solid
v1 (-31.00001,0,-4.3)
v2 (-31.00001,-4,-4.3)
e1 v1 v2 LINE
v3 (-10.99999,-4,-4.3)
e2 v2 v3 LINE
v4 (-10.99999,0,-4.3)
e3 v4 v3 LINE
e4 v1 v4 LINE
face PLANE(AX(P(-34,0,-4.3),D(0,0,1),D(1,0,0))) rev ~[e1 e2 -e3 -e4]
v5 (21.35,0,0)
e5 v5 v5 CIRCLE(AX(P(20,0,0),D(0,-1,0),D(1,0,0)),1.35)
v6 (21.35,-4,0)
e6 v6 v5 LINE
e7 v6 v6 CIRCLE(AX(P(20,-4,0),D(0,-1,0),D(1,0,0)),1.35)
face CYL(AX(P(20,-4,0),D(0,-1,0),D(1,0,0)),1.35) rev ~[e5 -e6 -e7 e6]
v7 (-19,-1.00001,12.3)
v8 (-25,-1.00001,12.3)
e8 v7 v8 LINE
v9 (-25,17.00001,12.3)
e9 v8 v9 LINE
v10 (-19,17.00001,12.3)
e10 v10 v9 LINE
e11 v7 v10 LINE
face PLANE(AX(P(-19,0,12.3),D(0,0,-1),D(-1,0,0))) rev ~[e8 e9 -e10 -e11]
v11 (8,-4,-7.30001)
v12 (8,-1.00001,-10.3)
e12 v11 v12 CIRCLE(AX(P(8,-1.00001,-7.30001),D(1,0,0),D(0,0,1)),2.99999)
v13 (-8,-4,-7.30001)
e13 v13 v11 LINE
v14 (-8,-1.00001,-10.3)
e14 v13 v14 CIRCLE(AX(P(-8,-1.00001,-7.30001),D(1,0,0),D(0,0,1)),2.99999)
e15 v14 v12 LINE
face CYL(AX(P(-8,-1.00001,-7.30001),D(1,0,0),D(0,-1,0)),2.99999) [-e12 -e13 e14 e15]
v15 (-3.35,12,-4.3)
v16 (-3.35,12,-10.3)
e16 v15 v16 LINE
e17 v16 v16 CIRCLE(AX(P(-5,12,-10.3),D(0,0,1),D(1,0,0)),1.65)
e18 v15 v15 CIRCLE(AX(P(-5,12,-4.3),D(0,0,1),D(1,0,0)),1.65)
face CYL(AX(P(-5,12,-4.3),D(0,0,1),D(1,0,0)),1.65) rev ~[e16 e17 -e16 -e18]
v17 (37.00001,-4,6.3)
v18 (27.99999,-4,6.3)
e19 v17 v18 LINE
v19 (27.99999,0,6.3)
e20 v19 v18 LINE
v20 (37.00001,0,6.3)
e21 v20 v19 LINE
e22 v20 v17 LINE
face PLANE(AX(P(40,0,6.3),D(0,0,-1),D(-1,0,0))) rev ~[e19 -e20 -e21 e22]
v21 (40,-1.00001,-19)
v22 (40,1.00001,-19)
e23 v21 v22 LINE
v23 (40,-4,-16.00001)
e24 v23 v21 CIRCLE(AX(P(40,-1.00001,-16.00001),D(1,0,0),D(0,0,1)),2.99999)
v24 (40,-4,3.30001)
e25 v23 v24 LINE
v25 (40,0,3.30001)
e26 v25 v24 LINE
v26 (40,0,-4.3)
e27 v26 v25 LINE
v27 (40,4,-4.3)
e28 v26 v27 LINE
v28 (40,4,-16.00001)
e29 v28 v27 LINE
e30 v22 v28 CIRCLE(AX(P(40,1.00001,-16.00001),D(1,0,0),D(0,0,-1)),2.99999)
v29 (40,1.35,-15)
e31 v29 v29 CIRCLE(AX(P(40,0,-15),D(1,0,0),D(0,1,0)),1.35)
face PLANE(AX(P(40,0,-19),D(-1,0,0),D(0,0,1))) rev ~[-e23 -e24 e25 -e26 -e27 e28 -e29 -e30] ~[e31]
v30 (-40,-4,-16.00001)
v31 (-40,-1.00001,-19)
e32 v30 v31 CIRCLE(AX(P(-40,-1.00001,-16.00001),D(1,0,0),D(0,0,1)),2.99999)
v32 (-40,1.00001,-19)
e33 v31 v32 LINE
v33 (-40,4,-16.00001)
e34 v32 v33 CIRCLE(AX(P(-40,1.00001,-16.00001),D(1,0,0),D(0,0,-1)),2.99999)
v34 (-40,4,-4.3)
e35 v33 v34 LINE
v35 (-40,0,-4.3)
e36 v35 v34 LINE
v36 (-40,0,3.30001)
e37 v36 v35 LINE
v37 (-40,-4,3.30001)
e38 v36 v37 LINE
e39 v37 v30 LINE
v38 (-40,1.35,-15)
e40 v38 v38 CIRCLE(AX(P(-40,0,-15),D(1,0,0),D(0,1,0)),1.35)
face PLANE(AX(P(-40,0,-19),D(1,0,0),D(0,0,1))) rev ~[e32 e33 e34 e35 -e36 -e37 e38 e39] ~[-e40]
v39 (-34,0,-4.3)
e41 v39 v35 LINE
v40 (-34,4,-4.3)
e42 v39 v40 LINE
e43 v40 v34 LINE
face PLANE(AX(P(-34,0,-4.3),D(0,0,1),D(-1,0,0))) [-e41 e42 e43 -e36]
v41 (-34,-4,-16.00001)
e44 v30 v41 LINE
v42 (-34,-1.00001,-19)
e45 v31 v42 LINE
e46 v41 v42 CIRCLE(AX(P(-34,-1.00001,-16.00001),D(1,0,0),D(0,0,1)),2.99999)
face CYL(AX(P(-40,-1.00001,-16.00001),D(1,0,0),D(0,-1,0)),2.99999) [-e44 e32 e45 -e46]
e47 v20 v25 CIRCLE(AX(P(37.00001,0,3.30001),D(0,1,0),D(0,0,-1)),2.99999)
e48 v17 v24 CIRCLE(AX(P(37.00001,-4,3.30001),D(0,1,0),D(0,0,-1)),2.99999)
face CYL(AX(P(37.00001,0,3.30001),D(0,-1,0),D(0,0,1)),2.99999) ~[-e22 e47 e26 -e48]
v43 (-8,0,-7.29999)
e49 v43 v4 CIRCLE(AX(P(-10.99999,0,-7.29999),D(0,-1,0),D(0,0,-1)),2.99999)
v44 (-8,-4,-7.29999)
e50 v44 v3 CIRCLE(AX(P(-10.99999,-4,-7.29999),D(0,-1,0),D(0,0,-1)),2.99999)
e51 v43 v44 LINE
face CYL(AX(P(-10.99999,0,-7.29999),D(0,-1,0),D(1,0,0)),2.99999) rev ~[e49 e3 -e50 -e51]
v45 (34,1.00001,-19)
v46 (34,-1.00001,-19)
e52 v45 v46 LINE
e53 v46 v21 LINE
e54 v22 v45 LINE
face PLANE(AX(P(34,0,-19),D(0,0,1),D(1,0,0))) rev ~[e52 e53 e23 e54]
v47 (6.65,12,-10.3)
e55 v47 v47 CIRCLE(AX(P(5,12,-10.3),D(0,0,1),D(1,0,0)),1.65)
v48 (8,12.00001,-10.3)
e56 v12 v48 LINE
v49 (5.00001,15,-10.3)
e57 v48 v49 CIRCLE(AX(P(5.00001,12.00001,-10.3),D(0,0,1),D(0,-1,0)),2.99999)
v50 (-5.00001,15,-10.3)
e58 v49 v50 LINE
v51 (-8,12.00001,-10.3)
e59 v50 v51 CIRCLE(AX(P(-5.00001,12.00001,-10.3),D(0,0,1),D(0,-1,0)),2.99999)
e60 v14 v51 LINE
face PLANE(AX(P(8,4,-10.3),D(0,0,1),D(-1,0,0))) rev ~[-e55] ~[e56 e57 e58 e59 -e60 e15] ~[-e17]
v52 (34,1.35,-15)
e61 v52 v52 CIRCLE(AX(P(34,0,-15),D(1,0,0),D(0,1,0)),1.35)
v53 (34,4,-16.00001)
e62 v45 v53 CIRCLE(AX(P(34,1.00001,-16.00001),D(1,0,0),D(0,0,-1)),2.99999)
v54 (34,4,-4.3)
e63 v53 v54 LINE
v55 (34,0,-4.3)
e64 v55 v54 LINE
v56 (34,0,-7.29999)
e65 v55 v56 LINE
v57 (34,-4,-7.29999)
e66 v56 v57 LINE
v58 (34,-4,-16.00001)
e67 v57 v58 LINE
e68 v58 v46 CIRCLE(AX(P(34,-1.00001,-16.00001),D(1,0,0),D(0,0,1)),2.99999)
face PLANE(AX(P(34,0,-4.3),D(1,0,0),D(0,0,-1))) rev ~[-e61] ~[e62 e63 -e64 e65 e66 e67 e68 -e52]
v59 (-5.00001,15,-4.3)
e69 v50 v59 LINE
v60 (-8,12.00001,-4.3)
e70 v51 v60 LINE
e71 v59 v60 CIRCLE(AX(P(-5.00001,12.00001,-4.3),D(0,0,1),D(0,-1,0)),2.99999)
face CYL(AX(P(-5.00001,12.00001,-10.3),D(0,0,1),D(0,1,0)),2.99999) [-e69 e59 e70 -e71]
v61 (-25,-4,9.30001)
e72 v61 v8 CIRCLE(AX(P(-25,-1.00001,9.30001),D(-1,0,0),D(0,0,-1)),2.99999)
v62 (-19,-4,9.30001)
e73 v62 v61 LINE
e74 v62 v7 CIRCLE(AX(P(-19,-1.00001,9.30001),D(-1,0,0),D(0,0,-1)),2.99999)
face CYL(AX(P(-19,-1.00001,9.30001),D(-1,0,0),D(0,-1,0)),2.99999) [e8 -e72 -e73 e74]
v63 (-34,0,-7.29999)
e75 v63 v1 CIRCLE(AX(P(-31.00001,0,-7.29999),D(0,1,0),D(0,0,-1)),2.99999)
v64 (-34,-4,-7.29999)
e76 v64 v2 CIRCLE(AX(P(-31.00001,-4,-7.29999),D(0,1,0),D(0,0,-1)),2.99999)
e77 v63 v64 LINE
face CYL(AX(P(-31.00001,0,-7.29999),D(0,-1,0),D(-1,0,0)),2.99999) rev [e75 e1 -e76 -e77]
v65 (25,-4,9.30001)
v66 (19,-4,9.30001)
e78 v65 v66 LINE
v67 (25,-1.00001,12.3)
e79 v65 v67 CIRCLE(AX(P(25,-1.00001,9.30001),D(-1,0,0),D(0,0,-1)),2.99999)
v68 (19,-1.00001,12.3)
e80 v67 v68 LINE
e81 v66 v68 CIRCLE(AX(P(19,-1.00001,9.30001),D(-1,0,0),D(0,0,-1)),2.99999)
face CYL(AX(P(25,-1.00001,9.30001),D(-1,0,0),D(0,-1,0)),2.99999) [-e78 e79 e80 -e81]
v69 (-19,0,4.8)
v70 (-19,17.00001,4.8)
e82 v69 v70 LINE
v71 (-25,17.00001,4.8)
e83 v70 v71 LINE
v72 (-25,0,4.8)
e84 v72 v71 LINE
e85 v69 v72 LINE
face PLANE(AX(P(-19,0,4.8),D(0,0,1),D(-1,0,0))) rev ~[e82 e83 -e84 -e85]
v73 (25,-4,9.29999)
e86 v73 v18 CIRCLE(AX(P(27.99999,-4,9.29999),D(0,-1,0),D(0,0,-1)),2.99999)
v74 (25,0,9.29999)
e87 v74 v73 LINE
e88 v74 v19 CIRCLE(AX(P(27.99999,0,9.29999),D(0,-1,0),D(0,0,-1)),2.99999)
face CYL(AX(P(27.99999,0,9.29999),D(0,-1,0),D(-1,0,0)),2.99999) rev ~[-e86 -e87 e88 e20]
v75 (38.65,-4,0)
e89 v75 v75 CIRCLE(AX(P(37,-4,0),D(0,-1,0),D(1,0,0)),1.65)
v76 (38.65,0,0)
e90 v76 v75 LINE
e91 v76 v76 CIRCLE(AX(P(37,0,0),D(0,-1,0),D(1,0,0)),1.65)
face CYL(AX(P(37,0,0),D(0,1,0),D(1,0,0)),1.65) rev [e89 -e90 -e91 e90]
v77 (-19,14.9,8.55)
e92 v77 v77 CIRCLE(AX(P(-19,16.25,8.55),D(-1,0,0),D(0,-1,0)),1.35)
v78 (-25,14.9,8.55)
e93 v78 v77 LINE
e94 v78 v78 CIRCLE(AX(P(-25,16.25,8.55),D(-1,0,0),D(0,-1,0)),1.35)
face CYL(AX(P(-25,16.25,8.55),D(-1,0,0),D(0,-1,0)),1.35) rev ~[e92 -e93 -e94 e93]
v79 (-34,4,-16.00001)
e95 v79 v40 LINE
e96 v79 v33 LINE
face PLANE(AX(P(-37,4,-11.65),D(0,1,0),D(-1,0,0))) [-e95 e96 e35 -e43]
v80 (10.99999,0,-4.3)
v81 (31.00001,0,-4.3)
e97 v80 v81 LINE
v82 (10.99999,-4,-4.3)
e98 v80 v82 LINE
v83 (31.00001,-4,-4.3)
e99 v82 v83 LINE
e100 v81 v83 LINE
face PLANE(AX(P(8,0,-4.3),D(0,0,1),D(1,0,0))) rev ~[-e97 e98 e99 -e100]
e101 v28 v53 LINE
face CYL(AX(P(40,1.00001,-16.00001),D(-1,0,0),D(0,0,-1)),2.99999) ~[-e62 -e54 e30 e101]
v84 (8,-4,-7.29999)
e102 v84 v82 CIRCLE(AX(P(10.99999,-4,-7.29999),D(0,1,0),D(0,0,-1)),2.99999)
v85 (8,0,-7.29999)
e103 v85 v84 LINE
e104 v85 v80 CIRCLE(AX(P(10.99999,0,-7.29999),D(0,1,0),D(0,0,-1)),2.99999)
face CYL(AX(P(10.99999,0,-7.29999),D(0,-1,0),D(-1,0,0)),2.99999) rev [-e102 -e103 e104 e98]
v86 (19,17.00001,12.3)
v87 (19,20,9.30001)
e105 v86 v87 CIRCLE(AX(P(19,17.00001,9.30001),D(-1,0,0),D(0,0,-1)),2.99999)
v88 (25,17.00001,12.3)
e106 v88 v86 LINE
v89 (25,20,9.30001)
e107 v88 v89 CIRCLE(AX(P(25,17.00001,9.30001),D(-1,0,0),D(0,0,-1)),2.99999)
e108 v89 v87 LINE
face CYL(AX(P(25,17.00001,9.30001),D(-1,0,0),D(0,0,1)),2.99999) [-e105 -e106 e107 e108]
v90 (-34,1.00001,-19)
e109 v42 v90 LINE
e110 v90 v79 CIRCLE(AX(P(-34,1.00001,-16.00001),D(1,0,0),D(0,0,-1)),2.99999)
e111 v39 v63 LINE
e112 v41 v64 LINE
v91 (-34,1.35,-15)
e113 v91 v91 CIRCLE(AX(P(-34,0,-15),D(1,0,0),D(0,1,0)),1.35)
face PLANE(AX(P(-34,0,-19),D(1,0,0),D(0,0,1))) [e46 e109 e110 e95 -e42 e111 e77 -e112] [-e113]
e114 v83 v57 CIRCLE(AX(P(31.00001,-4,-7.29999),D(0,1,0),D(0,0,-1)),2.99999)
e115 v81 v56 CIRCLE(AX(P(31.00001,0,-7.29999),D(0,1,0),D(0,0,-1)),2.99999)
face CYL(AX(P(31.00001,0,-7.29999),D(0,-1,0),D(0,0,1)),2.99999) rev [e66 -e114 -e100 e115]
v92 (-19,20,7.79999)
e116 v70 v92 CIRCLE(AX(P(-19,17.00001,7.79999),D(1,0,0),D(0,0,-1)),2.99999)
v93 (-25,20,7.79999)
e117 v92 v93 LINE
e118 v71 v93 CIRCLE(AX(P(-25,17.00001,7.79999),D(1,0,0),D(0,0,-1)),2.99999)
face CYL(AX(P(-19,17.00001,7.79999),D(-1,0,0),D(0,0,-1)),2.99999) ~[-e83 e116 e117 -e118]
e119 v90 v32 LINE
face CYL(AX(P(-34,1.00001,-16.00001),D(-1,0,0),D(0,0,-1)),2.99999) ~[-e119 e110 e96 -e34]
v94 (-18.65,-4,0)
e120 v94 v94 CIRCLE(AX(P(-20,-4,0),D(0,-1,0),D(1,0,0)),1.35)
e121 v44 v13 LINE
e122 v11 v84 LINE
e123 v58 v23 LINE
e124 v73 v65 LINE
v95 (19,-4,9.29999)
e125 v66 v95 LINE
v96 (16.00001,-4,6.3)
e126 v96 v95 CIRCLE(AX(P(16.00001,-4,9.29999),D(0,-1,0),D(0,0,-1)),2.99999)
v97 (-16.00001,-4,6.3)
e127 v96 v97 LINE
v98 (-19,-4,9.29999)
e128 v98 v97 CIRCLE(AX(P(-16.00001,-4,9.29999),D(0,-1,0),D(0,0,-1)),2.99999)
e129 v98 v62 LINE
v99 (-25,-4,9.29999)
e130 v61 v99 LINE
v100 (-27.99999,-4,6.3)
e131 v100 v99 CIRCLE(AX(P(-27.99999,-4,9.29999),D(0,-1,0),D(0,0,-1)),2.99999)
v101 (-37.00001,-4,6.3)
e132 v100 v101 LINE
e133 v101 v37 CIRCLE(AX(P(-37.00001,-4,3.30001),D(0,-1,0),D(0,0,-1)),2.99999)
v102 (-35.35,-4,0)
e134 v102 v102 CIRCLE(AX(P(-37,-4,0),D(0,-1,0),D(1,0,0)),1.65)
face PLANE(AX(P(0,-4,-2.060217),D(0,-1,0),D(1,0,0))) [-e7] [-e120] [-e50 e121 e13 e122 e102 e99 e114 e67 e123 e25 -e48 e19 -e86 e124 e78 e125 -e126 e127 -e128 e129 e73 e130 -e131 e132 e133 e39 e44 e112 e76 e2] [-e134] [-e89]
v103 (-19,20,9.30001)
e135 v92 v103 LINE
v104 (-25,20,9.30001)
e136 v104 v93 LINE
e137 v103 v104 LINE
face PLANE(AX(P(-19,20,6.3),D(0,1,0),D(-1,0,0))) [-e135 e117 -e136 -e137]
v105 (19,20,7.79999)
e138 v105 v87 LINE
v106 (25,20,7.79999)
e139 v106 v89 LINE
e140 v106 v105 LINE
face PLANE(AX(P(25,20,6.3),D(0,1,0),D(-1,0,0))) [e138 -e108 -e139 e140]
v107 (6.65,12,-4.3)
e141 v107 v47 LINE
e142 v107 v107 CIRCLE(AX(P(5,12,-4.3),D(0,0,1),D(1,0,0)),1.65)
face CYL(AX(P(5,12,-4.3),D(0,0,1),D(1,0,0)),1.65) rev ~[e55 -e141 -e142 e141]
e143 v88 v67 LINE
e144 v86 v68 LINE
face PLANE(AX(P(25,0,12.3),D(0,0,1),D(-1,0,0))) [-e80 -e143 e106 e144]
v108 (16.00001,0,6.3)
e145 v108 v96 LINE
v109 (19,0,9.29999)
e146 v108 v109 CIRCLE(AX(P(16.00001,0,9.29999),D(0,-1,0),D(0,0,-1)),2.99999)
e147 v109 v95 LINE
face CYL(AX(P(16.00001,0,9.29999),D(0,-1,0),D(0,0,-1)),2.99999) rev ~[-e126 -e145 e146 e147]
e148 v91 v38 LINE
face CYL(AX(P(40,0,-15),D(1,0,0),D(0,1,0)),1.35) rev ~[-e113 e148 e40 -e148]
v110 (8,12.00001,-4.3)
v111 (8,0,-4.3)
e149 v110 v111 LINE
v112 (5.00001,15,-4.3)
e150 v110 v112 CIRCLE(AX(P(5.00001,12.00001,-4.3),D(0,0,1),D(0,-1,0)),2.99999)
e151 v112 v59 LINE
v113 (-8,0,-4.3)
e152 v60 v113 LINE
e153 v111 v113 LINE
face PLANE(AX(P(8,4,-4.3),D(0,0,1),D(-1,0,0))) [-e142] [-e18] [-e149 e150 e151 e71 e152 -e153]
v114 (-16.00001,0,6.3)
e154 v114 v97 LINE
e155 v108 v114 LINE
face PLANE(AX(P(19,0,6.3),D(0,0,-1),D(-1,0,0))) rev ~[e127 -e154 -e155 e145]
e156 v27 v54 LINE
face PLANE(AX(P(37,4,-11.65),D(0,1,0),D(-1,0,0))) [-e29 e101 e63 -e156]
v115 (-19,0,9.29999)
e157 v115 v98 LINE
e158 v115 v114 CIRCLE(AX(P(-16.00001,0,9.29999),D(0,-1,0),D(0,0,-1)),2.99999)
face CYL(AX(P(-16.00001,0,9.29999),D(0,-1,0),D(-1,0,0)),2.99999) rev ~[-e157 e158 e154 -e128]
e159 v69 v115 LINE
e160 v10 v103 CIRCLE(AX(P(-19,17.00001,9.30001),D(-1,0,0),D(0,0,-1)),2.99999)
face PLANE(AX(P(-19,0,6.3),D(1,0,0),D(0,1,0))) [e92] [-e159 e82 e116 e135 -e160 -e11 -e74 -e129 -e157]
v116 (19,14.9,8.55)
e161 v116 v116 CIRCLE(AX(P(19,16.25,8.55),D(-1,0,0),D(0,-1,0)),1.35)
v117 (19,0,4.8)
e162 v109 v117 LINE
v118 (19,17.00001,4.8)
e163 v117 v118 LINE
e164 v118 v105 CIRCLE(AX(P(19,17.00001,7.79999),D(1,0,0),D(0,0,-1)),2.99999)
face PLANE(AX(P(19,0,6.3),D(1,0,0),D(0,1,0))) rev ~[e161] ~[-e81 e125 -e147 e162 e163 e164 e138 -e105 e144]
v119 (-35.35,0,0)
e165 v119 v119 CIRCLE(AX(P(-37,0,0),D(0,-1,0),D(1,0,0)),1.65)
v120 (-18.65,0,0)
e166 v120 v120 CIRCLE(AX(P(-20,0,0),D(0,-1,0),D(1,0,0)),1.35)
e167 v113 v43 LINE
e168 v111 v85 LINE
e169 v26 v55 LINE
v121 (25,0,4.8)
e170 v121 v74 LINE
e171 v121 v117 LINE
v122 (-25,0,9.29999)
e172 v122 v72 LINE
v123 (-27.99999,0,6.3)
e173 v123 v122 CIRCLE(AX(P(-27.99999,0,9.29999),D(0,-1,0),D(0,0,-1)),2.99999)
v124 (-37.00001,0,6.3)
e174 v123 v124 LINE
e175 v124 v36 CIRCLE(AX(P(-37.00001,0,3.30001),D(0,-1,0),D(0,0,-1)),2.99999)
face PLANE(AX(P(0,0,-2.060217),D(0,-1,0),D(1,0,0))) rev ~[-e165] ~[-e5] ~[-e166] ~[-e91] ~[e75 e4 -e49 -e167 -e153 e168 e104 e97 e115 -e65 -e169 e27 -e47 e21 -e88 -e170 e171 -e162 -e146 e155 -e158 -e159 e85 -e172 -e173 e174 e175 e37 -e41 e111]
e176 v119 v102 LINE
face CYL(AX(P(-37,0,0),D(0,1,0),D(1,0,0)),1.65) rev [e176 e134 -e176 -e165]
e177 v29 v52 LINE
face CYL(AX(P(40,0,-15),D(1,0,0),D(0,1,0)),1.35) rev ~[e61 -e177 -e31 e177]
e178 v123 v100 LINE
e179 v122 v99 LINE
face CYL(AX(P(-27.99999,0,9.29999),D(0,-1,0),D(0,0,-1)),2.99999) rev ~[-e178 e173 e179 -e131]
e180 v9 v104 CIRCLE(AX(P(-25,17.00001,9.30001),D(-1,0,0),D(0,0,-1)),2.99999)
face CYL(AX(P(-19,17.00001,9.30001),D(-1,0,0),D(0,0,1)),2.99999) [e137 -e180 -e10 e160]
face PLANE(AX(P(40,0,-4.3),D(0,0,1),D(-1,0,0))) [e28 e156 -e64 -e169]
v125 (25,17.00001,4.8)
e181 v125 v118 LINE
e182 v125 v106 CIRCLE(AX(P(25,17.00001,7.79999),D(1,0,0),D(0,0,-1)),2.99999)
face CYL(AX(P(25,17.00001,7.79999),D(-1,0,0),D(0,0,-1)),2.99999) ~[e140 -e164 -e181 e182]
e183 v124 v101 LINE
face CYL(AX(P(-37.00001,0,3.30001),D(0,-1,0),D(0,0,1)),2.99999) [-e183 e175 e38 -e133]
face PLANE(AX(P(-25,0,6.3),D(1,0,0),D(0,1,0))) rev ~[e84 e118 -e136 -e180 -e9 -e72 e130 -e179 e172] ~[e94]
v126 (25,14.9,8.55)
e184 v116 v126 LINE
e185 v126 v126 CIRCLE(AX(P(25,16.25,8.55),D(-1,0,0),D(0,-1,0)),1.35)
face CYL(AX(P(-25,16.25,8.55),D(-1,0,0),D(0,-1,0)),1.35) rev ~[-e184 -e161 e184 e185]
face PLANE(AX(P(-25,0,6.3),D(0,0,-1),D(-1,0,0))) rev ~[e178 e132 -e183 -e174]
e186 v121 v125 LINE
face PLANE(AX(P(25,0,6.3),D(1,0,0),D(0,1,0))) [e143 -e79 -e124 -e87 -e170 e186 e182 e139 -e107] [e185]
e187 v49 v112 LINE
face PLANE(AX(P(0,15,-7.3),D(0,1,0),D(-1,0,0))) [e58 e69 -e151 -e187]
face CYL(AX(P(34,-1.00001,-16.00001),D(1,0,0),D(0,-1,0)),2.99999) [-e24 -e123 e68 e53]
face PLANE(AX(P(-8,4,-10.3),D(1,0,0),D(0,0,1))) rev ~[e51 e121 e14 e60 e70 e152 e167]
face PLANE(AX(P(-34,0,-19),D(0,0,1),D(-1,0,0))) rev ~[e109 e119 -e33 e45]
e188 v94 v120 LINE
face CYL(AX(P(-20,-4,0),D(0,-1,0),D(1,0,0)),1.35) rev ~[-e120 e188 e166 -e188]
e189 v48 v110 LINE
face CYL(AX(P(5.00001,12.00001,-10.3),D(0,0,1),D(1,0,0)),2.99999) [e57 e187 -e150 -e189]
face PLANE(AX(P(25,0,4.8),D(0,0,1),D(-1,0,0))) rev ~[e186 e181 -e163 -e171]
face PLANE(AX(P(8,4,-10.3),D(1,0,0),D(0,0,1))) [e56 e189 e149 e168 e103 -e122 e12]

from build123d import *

# Parameters (mm, degrees)
F0_R      = 1.65
F1_DEPTH  = 4
F2_W      = 6
F2_H      = 14.7
F2_W_2    = 16
F2_H_2    = 6
F3_DEPTH  = 4
F4_W      = 6
F4_H      = 6
F5_DEPTH  = 20
F6_DEPTH  = 1.5
F7_DEPTH  = 11
F8_R      = 1.65
F9_DEPTH  = 14.701
F10_R     = 1.35
F11_DEPTH = 80.001
F12_R     = 1.35
F13_DEPTH = 65.001
F14_R     = 2.99999
F15_R     = 1.35
F16_DEPTH = 24.001


# Not quite as in the source:
# - a fillet or chamfer is up to 0.001 mm smaller than in the source, because OpenCascade refuses the exact size


with BuildPart() as f1:
    # F0 (on Front) → F1 (new body)
    with BuildSketch(Plane.XZ):
        Polygon((-25, 6.3), (-40, 6.3), (-40, -4.3), (-40, -19), (-34, -19), (-34, -4.3), (-8, -4.3), (-8, -10.3), (8, -10.3), (8, -4.3), (34, -4.3), (34, -19), (40, -19), (40, -4.3), (40, 6.3), (25, 6.3), (25, 12.3), (19, 12.3), (19, 6.3), (-19, 6.3), (-19, 12.3), (-25, 12.3), align=None)
        with Locations((-37, 0)):
            Circle(F0_R, mode=Mode.SUBTRACT)
        with Locations((37, 0)):
            Circle(F0_R, mode=Mode.SUBTRACT)
    extrude(amount=F1_DEPTH)

    # F2 (on face) → F3 (join)
    with BuildSketch(Plane(origin=(0, 0, 0), x_dir=(-1, 0, 0), z_dir=(0, 1, 0))):
        with Locations((37, -11.65)):
            Rectangle(F2_W, F2_H)
        with Locations((0, -7.3)):
            Rectangle(F2_W_2, F2_H_2)
        with Locations((-37, -11.65)):
            Rectangle(F2_W, F2_H)
    extrude(amount=F3_DEPTH)

    # F4 (on face) → F5 (join)
    with BuildSketch(Plane(origin=(0, 0, 0), x_dir=(-1, 0, 0), z_dir=(0, 1, 0))):
        with Locations((-22, 9.3)):
            Rectangle(F4_W, F4_H)
        with Locations((22, 9.3)):
            Rectangle(F4_W, F4_H)
    extrude(amount=F5_DEPTH)

    # F6 (add): faces of the model
    f6_faces = [f1.faces().sort_by_distance(p)[0] for p in [
        (22, 10, 6.3),
        (-22, 10, 6.3),
    ]]
    extrude(f6_faces, amount=F6_DEPTH)

    # F7 (add): a face of the model
    f7_faces = [f1.faces().sort_by_distance(p)[0] for p in [
        (0, 4, -7.3),
    ]]
    extrude(f7_faces, amount=F7_DEPTH)

    # F8 (on face) → F9 (cut, through all)
    with BuildSketch(Plane.XY.offset(-4.3)):
        with Locations((5, 12)):
            Circle(F8_R)
        with Locations((-5, 12)):
            Circle(F8_R)
    extrude(amount=-F9_DEPTH, mode=Mode.SUBTRACT)

    # F10 (on face) → F11 (cut, through all)
    with BuildSketch(Plane.YZ.offset(40)):
        with Locations((0, -15)):
            Circle(F10_R)
    extrude(amount=-F11_DEPTH, mode=Mode.SUBTRACT)

    # F12 (on face) → F13 (cut, through all)
    with BuildSketch(Plane(origin=(-25, 0, 0), x_dir=(0, -1, 0), z_dir=(-1, 0, 0))):
        with Locations((-16.25, 8.55)):
            Circle(F12_R)
    extrude(amount=-F13_DEPTH, mode=Mode.SUBTRACT)

    # F14 (radius 3 in the source; OpenCascade refuses exactly that, so slightly less here)
    f14_edges = [f1.edges().sort_by_distance(p)[0] for p in [
        (-37, -4, -19),
        (37, -4, -19),
        (37, 4, -19),
        (-37, 4, -19),
        (8, 15, -7.3),
        (-8, 15, -7.3),
        (-22, 20, 12.3),
        (22, 20, 12.3),
        (-22, 20, 4.8),
        (22, 20, 4.8),
        (-22, -4, 12.3),
        (22, -4, 12.3),
        (-34, -2, -4.3),
        (34, -2, -4.3),
        (-8, -2, -4.3),
        (8, -2, -4.3),
        (-25, -2, 6.3),
        (19, -2, 6.3),
        (-19, -2, 6.3),
        (25, -2, 6.3),
        (-40, -2, 6.3),
        (40, -2, 6.3),
        (0, -4, -10.3),
    ]]
    fillet(f14_edges, radius=F14_R)

    # F15 (on face) → F16 (cut, through all)
    with BuildSketch(Plane.XZ.offset(4)):
        with Locations((-20, 0)):
            Circle(F15_R)
        with Locations((20, 0)):
            Circle(F15_R)
    extrude(amount=-F16_DEPTH, mode=Mode.SUBTRACT)


solid = f1.part
